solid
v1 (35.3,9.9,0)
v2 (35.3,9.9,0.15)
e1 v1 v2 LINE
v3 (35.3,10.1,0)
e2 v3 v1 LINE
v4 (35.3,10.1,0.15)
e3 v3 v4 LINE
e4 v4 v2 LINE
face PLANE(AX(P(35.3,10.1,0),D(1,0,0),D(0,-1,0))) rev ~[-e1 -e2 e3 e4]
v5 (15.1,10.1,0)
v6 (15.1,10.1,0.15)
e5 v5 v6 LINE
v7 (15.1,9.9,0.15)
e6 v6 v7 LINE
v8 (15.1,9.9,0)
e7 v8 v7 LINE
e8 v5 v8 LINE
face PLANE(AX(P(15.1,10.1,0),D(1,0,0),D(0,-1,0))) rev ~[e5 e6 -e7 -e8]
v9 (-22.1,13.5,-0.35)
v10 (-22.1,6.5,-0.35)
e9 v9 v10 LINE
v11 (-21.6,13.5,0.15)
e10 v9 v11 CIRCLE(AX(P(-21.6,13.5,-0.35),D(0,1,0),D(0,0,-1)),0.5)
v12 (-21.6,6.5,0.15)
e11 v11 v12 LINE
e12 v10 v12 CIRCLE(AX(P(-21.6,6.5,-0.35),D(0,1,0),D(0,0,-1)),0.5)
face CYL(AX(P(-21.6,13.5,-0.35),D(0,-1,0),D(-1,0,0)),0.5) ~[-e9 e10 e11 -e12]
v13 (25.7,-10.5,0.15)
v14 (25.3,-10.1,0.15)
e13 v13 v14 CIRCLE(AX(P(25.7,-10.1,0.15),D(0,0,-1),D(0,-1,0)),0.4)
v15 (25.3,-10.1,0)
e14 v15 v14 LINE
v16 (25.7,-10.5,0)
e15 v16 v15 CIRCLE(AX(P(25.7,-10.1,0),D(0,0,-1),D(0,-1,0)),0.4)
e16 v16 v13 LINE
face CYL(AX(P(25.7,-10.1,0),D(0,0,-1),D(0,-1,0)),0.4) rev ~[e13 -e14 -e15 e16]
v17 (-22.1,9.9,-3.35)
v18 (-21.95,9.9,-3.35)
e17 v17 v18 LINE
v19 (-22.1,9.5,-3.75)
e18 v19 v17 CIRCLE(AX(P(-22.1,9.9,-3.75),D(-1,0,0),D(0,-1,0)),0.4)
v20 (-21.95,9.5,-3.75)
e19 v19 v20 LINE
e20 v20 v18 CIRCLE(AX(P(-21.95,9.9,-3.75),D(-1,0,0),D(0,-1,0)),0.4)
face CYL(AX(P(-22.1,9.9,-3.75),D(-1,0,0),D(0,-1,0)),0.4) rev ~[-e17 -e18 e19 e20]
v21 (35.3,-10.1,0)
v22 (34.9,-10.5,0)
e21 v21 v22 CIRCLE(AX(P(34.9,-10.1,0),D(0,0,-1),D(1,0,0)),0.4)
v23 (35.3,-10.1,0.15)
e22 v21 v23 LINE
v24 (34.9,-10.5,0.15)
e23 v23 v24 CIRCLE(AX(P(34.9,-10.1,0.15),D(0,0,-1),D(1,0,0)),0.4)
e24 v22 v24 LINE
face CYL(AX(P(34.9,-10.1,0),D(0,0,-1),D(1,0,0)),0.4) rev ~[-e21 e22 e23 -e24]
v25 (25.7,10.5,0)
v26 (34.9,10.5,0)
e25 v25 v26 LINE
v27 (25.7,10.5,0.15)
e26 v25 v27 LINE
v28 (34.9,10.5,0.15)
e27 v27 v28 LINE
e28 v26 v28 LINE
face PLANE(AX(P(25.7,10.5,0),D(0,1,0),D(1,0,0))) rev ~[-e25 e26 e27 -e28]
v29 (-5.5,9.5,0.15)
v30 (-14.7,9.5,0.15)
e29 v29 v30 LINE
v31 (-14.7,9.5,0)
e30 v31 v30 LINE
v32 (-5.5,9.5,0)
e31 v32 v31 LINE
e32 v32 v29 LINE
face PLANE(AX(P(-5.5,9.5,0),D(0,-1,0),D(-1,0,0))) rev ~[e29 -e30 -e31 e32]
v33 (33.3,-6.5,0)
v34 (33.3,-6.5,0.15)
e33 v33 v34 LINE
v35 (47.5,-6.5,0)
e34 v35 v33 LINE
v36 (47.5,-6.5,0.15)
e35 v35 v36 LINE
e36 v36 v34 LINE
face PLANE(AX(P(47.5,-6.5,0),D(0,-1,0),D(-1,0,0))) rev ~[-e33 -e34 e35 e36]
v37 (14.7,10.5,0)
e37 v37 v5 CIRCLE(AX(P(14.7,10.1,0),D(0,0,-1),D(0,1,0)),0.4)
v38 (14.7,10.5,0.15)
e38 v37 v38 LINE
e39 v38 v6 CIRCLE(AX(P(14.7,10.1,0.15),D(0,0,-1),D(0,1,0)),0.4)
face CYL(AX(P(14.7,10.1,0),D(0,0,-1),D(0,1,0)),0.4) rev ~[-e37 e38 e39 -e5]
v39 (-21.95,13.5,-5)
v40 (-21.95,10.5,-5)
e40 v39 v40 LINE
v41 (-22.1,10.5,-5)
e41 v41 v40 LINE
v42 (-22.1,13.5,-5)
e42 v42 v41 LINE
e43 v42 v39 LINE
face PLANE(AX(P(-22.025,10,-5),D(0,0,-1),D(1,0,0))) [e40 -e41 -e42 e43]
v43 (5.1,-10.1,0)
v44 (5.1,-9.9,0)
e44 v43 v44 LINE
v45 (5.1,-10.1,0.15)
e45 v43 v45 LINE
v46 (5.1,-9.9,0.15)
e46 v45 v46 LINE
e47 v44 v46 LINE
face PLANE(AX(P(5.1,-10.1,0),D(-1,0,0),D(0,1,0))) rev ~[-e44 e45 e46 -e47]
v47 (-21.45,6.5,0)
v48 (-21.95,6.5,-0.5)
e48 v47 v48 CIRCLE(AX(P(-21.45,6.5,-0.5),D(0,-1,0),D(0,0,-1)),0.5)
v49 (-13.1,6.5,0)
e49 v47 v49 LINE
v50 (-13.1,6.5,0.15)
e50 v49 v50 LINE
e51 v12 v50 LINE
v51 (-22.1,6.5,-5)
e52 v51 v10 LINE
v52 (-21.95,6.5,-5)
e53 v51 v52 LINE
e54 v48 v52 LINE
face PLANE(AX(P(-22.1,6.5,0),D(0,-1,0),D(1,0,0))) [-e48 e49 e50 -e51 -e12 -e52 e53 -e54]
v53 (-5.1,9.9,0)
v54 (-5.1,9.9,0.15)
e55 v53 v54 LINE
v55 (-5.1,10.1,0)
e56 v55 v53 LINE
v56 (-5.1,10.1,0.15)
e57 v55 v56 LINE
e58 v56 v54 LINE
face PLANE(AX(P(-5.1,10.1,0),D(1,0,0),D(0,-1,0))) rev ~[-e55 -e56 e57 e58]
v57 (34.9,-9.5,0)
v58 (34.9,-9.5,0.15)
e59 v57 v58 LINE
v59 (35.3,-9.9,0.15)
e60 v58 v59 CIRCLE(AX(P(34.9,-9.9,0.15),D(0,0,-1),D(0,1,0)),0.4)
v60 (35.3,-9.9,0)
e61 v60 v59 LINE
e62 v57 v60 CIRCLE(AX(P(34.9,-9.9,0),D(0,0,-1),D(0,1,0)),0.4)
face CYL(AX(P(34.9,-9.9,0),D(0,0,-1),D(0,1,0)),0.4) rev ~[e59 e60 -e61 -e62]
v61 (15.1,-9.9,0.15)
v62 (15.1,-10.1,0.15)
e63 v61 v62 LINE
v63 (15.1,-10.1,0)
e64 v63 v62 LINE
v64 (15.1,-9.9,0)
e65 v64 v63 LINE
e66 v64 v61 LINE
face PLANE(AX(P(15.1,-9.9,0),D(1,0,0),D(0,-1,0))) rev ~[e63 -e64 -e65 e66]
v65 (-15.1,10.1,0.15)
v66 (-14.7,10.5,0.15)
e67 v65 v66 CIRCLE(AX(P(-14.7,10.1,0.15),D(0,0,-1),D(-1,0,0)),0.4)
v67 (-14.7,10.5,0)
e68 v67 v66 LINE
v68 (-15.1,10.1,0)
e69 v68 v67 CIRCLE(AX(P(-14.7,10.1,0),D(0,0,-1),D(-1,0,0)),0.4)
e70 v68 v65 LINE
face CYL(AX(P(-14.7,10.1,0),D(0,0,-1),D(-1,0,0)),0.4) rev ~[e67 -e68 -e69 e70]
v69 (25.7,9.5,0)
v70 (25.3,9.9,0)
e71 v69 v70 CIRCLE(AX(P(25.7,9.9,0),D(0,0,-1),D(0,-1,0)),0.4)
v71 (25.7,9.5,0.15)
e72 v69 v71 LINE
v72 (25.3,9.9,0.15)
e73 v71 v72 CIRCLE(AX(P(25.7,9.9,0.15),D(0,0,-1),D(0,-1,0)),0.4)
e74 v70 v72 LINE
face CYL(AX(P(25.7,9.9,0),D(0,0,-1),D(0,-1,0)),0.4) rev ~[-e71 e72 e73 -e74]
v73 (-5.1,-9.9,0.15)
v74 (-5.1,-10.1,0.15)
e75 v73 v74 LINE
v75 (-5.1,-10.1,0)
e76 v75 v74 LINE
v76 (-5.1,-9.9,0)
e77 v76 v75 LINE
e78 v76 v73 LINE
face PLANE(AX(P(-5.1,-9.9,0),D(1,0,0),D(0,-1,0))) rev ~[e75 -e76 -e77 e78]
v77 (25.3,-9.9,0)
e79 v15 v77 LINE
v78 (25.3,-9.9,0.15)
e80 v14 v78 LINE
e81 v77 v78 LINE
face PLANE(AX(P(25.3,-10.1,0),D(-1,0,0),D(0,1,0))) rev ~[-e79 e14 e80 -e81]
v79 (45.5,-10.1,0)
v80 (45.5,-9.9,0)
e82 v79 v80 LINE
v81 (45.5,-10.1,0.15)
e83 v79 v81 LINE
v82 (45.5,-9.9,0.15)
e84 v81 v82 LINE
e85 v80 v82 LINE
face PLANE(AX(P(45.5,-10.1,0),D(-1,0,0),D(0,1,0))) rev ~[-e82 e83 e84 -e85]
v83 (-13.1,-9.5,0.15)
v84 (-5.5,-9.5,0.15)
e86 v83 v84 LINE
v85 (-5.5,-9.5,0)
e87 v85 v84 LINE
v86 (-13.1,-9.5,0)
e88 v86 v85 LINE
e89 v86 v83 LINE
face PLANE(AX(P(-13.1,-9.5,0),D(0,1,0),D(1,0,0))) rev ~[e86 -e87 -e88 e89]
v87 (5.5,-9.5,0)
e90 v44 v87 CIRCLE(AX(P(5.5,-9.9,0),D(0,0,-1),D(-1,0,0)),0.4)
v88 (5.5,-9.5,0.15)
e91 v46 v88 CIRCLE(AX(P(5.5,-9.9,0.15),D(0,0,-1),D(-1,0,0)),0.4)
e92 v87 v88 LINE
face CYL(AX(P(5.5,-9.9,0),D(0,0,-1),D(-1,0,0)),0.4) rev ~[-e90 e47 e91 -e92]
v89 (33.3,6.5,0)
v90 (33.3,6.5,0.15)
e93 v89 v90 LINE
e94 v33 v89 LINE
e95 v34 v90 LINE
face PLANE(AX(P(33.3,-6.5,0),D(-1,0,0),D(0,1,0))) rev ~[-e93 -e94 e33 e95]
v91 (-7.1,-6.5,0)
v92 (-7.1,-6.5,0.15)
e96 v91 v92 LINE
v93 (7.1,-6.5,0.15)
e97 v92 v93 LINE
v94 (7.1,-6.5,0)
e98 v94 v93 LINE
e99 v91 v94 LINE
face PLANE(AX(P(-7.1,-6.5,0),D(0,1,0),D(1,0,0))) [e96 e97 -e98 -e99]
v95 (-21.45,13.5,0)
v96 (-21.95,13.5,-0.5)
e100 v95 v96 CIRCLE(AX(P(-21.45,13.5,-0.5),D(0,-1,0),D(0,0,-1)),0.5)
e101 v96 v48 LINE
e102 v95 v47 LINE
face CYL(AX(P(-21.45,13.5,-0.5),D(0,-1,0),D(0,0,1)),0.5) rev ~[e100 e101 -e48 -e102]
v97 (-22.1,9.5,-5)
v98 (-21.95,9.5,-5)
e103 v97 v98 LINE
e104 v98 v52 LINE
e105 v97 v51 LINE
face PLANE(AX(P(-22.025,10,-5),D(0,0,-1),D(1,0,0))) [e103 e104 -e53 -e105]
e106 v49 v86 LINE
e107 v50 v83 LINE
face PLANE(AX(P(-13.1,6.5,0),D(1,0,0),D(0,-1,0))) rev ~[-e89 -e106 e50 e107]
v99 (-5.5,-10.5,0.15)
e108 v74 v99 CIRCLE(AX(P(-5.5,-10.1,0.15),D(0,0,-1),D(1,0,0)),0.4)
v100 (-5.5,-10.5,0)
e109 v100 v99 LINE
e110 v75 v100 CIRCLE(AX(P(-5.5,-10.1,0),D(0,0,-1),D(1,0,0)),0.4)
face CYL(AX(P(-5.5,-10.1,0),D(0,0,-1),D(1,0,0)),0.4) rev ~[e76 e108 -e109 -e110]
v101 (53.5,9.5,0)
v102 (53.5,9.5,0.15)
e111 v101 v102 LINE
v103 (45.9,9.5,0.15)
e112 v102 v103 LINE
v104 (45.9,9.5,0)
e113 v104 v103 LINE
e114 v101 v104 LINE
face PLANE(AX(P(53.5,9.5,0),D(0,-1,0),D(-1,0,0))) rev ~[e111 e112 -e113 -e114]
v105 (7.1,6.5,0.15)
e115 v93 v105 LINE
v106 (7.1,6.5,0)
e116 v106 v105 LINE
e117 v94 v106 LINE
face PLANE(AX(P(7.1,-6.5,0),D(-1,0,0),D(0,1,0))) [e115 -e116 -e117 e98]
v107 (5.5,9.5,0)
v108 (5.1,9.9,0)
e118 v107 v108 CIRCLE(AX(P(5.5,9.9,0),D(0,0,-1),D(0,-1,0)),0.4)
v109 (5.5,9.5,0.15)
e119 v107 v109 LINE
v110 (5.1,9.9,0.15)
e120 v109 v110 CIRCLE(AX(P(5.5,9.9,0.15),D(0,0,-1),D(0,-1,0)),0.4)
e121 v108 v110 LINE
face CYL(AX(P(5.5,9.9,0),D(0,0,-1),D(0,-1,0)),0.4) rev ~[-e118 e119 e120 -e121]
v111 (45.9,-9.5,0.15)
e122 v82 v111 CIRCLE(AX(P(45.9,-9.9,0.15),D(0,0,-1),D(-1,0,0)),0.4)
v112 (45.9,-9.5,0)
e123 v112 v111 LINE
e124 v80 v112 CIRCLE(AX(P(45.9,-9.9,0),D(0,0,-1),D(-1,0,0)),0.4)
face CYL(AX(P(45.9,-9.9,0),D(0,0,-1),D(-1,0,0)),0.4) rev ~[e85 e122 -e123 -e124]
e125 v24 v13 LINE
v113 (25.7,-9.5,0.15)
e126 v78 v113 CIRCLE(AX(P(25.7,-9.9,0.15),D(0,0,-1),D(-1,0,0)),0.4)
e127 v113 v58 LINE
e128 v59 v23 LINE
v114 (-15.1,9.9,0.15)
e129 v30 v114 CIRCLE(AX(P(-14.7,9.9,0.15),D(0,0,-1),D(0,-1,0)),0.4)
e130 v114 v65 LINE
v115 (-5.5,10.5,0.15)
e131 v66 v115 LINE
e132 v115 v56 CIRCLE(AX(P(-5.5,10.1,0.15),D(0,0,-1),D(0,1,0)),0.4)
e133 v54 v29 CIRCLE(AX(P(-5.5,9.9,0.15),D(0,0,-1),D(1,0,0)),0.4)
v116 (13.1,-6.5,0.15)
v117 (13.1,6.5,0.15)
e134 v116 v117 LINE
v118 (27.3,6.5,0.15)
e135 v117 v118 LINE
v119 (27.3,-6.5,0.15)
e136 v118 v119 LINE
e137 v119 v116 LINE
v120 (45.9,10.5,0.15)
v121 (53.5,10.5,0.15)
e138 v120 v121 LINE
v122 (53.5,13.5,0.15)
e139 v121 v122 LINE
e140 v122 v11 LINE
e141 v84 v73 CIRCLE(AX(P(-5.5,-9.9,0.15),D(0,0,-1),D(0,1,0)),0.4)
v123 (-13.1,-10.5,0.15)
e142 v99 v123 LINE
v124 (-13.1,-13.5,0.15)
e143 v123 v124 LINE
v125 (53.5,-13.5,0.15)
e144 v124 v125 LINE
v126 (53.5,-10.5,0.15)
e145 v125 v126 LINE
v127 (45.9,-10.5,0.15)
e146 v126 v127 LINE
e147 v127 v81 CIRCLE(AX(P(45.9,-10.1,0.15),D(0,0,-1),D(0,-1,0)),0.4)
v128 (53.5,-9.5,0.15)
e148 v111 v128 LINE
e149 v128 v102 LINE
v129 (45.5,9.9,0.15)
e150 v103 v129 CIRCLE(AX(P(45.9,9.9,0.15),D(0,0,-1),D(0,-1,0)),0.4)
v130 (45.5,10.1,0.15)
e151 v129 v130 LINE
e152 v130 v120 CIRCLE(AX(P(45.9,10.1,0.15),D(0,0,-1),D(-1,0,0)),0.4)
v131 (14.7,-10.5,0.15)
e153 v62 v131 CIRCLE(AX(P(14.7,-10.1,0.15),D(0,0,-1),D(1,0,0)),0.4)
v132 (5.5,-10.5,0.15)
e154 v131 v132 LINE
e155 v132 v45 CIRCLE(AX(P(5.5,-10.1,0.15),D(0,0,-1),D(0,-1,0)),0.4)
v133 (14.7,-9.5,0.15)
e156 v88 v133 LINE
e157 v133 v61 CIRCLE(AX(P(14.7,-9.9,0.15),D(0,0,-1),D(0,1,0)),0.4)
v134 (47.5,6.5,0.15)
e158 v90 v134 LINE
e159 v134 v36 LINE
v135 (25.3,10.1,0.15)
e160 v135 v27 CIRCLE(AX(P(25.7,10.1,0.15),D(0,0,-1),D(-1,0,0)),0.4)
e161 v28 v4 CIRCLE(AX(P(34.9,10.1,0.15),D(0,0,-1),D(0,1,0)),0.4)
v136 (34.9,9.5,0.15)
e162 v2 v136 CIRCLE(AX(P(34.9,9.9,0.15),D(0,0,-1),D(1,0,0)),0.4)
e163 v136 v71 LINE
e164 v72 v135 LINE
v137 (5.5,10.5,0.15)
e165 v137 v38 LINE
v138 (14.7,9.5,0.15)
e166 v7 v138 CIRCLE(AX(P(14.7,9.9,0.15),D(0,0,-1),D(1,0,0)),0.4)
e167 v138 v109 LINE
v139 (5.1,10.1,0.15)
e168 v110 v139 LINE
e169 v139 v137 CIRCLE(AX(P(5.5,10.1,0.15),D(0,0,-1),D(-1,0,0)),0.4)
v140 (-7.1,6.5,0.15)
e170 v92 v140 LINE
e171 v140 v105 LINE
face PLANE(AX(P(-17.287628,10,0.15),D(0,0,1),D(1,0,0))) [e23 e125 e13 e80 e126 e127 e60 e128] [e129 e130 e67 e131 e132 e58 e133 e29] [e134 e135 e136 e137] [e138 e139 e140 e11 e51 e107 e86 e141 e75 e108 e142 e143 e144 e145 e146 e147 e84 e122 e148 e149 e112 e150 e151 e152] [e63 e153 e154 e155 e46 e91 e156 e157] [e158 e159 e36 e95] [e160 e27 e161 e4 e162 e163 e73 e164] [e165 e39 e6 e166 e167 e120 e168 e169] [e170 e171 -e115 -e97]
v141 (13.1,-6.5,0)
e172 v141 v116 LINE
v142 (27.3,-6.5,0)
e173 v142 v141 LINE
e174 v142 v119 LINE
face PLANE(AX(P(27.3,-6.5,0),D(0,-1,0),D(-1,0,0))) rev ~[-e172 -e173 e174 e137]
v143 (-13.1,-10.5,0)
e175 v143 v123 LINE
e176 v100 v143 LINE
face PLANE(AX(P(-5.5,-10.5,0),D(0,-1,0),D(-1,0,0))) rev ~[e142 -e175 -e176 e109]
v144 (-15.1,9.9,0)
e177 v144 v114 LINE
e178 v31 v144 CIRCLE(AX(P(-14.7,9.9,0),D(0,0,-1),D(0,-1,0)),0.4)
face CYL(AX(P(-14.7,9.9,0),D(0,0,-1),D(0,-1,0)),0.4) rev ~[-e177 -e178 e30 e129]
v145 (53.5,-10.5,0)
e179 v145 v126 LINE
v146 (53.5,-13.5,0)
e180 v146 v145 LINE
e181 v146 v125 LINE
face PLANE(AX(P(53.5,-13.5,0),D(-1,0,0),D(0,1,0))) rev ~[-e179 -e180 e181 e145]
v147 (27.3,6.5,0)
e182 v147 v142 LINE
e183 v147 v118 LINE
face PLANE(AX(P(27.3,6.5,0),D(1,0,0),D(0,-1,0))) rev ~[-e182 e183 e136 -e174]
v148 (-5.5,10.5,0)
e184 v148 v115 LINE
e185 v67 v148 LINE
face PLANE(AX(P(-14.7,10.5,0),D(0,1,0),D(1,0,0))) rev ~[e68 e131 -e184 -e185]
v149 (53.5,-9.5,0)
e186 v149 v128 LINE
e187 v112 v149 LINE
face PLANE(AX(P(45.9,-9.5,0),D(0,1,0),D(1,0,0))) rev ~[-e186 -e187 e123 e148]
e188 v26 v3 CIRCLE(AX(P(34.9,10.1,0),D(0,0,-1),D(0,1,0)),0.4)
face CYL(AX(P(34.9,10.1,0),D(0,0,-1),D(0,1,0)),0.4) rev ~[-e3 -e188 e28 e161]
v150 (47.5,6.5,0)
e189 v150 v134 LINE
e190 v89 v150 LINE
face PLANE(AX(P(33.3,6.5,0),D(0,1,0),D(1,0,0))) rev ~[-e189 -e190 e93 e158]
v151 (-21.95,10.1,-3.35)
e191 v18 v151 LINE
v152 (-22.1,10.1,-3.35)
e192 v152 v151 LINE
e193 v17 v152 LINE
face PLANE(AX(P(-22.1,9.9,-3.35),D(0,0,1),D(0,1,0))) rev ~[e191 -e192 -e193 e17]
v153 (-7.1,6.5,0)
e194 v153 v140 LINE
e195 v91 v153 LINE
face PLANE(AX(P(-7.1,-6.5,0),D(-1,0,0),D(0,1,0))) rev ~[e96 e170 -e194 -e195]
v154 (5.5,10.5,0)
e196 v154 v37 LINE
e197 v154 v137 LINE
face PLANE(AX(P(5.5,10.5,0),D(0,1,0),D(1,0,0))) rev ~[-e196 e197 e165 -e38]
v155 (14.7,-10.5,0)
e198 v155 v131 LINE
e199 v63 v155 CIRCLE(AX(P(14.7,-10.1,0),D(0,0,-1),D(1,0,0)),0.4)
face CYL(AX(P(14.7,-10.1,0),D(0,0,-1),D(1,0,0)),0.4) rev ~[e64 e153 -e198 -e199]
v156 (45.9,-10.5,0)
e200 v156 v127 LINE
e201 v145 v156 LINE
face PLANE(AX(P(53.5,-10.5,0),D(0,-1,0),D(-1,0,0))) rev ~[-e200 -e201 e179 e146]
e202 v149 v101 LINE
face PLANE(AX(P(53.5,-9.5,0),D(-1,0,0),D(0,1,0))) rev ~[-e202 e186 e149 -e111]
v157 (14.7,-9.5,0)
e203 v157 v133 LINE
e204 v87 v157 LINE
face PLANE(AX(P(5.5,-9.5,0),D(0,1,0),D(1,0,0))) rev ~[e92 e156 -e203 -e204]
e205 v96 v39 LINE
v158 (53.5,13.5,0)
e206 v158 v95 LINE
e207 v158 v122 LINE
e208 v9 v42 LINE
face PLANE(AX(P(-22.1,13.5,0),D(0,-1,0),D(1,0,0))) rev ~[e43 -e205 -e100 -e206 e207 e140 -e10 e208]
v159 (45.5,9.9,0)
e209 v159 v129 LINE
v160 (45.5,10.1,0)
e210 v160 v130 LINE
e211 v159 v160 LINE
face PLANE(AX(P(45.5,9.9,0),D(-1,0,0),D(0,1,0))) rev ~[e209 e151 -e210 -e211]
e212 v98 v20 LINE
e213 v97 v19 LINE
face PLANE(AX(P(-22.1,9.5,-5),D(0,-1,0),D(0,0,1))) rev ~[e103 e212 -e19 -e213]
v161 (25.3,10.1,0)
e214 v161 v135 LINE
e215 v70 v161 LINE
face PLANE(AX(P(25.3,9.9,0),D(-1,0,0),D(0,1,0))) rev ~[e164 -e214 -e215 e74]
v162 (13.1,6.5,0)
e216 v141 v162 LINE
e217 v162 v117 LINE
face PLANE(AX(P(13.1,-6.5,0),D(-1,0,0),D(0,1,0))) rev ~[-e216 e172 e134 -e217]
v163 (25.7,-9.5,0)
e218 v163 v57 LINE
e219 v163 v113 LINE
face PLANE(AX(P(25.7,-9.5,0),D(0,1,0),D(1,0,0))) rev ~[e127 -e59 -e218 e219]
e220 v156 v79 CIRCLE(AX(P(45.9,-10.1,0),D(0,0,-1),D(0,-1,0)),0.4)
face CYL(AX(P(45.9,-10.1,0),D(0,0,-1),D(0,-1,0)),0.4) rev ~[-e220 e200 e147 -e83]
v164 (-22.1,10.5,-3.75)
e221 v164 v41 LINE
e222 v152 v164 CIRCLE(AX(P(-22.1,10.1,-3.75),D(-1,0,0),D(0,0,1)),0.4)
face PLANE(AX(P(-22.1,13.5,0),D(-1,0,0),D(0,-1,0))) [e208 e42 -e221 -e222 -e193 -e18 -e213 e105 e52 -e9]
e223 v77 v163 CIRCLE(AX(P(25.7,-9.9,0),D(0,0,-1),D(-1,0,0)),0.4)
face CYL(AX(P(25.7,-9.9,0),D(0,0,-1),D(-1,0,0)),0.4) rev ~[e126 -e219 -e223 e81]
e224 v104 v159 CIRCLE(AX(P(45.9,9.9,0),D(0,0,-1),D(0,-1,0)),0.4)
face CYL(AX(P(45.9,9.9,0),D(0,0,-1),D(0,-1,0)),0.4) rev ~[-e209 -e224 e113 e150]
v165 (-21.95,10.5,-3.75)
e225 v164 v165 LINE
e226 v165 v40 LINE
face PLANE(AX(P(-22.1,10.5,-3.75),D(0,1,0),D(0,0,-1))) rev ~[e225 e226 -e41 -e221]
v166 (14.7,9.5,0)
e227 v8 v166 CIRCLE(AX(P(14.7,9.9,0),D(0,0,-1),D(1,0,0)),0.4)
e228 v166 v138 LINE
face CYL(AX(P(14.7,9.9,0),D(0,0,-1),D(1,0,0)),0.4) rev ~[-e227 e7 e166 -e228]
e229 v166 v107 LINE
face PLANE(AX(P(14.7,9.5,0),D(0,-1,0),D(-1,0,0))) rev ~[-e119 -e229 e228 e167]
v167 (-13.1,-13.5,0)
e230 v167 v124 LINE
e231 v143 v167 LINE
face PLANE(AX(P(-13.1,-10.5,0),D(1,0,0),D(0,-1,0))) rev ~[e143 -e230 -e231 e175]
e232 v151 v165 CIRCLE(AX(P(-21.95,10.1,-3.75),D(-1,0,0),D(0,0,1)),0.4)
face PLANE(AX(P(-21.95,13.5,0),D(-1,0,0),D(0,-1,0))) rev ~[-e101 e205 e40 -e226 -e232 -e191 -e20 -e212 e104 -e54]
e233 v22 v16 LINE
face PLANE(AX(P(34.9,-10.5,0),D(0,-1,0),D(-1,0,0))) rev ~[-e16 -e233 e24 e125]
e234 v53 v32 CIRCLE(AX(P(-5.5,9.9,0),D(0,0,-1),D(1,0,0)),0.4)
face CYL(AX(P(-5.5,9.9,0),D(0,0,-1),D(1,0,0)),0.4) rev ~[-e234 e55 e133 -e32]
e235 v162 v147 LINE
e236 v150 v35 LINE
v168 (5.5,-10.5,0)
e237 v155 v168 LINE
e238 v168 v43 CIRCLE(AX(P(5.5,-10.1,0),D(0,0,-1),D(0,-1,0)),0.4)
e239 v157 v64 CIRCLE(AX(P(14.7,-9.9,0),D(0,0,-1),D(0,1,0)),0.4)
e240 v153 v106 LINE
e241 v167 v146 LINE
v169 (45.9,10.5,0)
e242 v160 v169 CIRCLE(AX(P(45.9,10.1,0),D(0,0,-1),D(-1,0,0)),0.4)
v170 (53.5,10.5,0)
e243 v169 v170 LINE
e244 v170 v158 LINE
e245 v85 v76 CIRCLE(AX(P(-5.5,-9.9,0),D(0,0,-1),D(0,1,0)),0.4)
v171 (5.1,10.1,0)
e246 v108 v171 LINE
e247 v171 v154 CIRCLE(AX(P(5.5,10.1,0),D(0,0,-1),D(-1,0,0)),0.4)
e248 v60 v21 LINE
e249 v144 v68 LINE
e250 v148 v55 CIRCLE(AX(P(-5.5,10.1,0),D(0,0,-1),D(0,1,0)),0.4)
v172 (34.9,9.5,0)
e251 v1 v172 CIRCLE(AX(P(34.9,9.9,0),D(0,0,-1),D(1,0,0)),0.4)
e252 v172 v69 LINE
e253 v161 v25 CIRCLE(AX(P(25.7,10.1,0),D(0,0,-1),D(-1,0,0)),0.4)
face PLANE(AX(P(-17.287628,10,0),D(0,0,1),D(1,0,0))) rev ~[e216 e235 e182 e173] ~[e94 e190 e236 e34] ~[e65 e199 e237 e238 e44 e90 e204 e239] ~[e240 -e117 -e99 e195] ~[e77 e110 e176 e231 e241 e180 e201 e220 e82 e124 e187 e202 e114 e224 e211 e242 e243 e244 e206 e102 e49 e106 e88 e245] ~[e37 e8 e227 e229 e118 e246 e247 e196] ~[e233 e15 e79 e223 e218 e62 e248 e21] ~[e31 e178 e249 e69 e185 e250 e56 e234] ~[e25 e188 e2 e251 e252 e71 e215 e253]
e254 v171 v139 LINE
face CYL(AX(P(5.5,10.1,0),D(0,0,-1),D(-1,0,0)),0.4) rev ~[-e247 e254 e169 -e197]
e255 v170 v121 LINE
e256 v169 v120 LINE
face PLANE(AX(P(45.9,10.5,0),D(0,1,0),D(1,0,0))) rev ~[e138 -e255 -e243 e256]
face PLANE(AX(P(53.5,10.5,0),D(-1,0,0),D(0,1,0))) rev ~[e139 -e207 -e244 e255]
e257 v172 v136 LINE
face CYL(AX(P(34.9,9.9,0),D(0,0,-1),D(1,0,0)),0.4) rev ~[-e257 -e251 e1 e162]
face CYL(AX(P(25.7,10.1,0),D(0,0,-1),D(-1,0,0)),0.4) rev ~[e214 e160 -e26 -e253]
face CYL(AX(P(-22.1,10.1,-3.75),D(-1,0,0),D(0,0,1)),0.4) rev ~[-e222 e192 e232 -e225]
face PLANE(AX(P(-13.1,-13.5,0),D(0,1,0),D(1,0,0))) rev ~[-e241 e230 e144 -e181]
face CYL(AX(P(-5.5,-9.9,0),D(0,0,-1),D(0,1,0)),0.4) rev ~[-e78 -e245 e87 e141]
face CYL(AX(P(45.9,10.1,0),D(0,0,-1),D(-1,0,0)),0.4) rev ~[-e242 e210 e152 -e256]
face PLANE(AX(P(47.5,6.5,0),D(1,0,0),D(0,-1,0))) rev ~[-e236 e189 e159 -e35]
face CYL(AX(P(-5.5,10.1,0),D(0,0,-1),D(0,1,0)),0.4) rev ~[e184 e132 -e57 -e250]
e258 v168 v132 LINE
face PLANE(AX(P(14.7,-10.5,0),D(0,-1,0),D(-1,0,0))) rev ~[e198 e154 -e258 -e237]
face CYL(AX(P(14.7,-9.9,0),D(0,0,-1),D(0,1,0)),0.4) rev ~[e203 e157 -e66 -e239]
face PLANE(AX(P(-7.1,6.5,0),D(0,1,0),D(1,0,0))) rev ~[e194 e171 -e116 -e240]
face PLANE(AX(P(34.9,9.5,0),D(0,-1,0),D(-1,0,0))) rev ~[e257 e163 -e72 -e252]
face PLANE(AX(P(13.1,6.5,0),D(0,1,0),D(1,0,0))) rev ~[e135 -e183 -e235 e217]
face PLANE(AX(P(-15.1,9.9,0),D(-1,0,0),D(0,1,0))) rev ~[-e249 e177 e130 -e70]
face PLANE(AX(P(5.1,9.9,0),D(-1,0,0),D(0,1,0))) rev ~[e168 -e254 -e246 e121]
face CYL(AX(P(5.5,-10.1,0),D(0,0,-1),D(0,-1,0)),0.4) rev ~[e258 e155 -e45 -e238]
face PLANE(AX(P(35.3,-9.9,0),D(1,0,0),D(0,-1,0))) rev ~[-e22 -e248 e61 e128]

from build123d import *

# Parameters (mm, degrees)
F0_W     = 14.2
F0_H     = 13
F1_DEPTH = 0.15
F2_W     = 0.15
F2_H     = 7
F3_DEPTH = 5
F4_R     = 0.5
F6_DEPTH = 25


# Not quite as in the source:
# - a feature names something its author has since deleted; it is built from what else it names


with BuildPart() as f1:
    # F0 (on Top) → F1 (new body)
    with BuildSketch(Plane.XY):
        with BuildLine():
            Line((-13.1, 10.5), (-13.1, 13.5))
            Line((-13.1, 13.5), (-22.1, 13.5))
            Line((-22.1, 13.5), (-22.1, 6.5))
            Line((-22.1, 6.5), (-13.1, 6.5))
            Line((-13.1, 6.5), (-13.1, 9.5))
            Line((-13.1, 9.5), (-14.7, 9.5))
            ThreePointArc((-14.7, 9.5), (-14.9828427125, 9.6171572875), (-15.1, 9.9))
            Line((-15.1, 9.9), (-15.1, 10.1))
            ThreePointArc((-15.1, 10.1), (-14.9828427125, 10.3828427125), (-14.7, 10.5))
            Line((-14.7, 10.5), (-13.1, 10.5))
        make_face()
        with BuildLine():
            Line((13.1, 10.5), (13.1, 13.5))
            Line((13.1, 13.5), (-7.1, 13.5))
            Line((-7.1, 13.5), (-13.1, 13.5))
            Line((-13.1, 13.5), (-13.1, 10.5))
            Line((-13.1, 10.5), (-5.5, 10.5))
            ThreePointArc((-5.5, 10.5), (-5.2171572875, 10.3828427125), (-5.1, 10.1))
            Line((-5.1, 10.1), (-5.1, 9.9))
            ThreePointArc((-5.1, 9.9), (-5.2171572875, 9.6171572875), (-5.5, 9.5))
            Line((-5.5, 9.5), (-13.1, 9.5))
            Line((-13.1, 9.5), (-13.1, 6.5))
            Line((-13.1, 6.5), (-13.1, 0))
            Line((-13.1, 0), (-13.1, -6.5))
            Line((-13.1, -6.5), (-13.1, -9.5))
            Line((-13.1, -9.5), (-5.5, -9.5))
            ThreePointArc((-5.5, -9.5), (-5.2171572875, -9.6171572875), (-5.1, -9.9))
            Line((-5.1, -9.9), (-5.1, -10.1))
            ThreePointArc((-5.1, -10.1), (-5.2171572875, -10.3828427125), (-5.5, -10.5))
            Line((-5.5, -10.5), (-13.1, -10.5))
            Line((-13.1, -10.5), (-13.1, -13.5))
            Line((-13.1, -13.5), (-7.1, -13.5))
            Line((-7.1, -13.5), (13.1, -13.5))
            Line((13.1, -13.5), (13.1, -10.5))
            Line((13.1, -10.5), (5.5, -10.5))
            ThreePointArc((5.5, -10.5), (5.2171572875, -10.3828427125), (5.1, -10.1))
            Line((5.1, -10.1), (5.1, -9.9))
            ThreePointArc((5.1, -9.9), (5.2171572875, -9.6171572875), (5.5, -9.5))
            Line((5.5, -9.5), (13.1, -9.5))
            Line((13.1, -9.5), (13.1, -6.5))
            Line((13.1, -6.5), (13.1, 0))
            Line((13.1, 0), (13.1, 6.5))
            Line((13.1, 6.5), (13.1, 9.5))
            Line((13.1, 9.5), (5.5, 9.5))
            ThreePointArc((5.5, 9.5), (5.2171572875, 9.6171572875), (5.1, 9.9))
            Line((5.1, 9.9), (5.1, 10.1))
            ThreePointArc((5.1, 10.1), (5.2171572875, 10.3828427125), (5.5, 10.5))
            Line((5.5, 10.5), (13.1, 10.5))
        make_face()
        Rectangle(F0_W, F0_H, mode=Mode.SUBTRACT)
        with BuildLine():
            Line((33.3, 13.5), (13.1, 13.5))
            Line((13.1, 13.5), (13.1, 10.5))
            Line((13.1, 10.5), (14.7, 10.5))
            ThreePointArc((14.7, 10.5), (14.9828427125, 10.3828427125), (15.1, 10.1))
            Line((15.1, 10.1), (15.1, 9.9))
            ThreePointArc((15.1, 9.9), (14.9828427125, 9.6171572875), (14.7, 9.5))
            Line((14.7, 9.5), (13.1, 9.5))
            Line((13.1, 9.5), (13.1, 6.5))
            Line((13.1, 6.5), (27.3, 6.5))
            Line((27.3, 6.5), (27.3, -6.5))
            Line((27.3, -6.5), (13.1, -6.5))
            Line((13.1, -6.5), (13.1, -9.5))
            Line((13.1, -9.5), (14.7, -9.5))
            ThreePointArc((14.7, -9.5), (14.9828427125, -9.6171572875), (15.1, -9.9))
            Line((15.1, -9.9), (15.1, -10.1))
            ThreePointArc((15.1, -10.1), (14.9828427125, -10.3828427125), (14.7, -10.5))
            Line((14.7, -10.5), (13.1, -10.5))
            Line((13.1, -10.5), (13.1, -13.5))
            Line((13.1, -13.5), (33.3, -13.5))
            Line((33.3, -13.5), (33.3, -10.5))
            Line((33.3, -10.5), (25.7, -10.5))
            ThreePointArc((25.7, -10.5), (25.4171572875, -10.3828427125), (25.3, -10.1))
            Line((25.3, -10.1), (25.3, -9.9))
            ThreePointArc((25.3, -9.9), (25.4171572875, -9.6171572875), (25.7, -9.5))
            Line((25.7, -9.5), (33.3, -9.5))
            Line((33.3, -9.5), (33.3, -6.5))
            Line((33.3, -6.5), (33.3, 0))
            Line((33.3, 0), (33.3, 6.5))
            Line((33.3, 6.5), (33.3, 9.5))
            Line((33.3, 9.5), (25.7, 9.5))
            ThreePointArc((25.7, 9.5), (25.4171572875, 9.6171572875), (25.3, 9.9))
            Line((25.3, 9.9), (25.3, 10.1))
            ThreePointArc((25.3, 10.1), (25.4171572875, 10.3828427125), (25.7, 10.5))
            Line((25.7, 10.5), (33.3, 10.5))
            Line((33.3, 10.5), (33.3, 13.5))
        make_face()
        with BuildLine():
            Line((53.5, 13.5), (33.3, 13.5))
            Line((33.3, 13.5), (33.3, 10.5))
            Line((33.3, 10.5), (34.9, 10.5))
            ThreePointArc((34.9, 10.5), (35.1828427125, 10.3828427125), (35.3, 10.1))
            Line((35.3, 10.1), (35.3, 9.9))
            ThreePointArc((35.3, 9.9), (35.1828427125, 9.6171572875), (34.9, 9.5))
            Line((34.9, 9.5), (33.3, 9.5))
            Line((33.3, 9.5), (33.3, 6.5))
            Line((33.3, 6.5), (47.5, 6.5))
            Line((47.5, 6.5), (47.5, -6.5))
            Line((47.5, -6.5), (33.3, -6.5))
            Line((33.3, -6.5), (33.3, -9.5))
            Line((33.3, -9.5), (34.9, -9.5))
            ThreePointArc((34.9, -9.5), (35.1828427125, -9.6171572875), (35.3, -9.9))
            Line((35.3, -9.9), (35.3, -10.1))
            ThreePointArc((35.3, -10.1), (35.1828427125, -10.3828427125), (34.9, -10.5))
            Line((34.9, -10.5), (33.3, -10.5))
            Line((33.3, -10.5), (33.3, -13.5))
            Line((33.3, -13.5), (53.5, -13.5))
            Line((53.5, -13.5), (53.5, -10.5))
            Line((53.5, -10.5), (45.9, -10.5))
            ThreePointArc((45.9, -10.5), (45.6171572875, -10.3828427125), (45.5, -10.1))
            Line((45.5, -10.1), (45.5, -9.9))
            ThreePointArc((45.5, -9.9), (45.6171572875, -9.6171572875), (45.9, -9.5))
            Line((45.9, -9.5), (53.5, -9.5))
            Line((53.5, -9.5), (53.5, 0))
            Line((53.5, 0), (53.5, 9.5))
            Line((53.5, 9.5), (45.9, 9.5))
            ThreePointArc((45.9, 9.5), (45.6171572875, 9.6171572875), (45.5, 9.9))
            Line((45.5, 9.9), (45.5, 10.1))
            ThreePointArc((45.5, 10.1), (45.6171572875, 10.3828427125), (45.9, 10.5))
            Line((45.9, 10.5), (53.5, 10.5))
            Line((53.5, 10.5), (53.5, 13.5))
        make_face()
    extrude(amount=F1_DEPTH)

    # F2 (on face) → F3 (join)
    with BuildSketch(Plane(origin=(0, 0, 0), x_dir=(1, 0, 0), z_dir=(0, 0, -1))):
        with Locations((-22.025, -10)):
            Rectangle(F2_W, F2_H)
    extrude(amount=F3_DEPTH)

    # F4
    f4_edges = [f1.edges().sort_by_distance(p)[0] for p in [
        (-21.95, 10, 0),
        (-22.1, 10, 0.15),
    ]]
    fillet(f4_edges, radius=F4_R)

    # F5 (on face) → F6 (cut)
    with BuildSketch(Plane(origin=(-22.1, 0, 0), x_dir=(0, -1, 0), z_dir=(-1, 0, 0))):
        with BuildLine():
            Line((-9.9, -3.35), (-10, -3.35))
            Line((-10, -3.35), (-10.1, -3.35))
            ThreePointArc((-10.1, -3.35), (-10.3828427125, -3.4671572875), (-10.5, -3.75))
            Line((-10.5, -3.75), (-10.5, -5))
            Line((-10.5, -5), (-9.5, -5))
            Line((-9.5, -5), (-9.5, -3.75))
            ThreePointArc((-9.5, -3.75), (-9.6171572875, -3.4671572875), (-9.9, -3.35))
        make_face()
    extrude(amount=-F6_DEPTH, mode=Mode.SUBTRACT)


solid = f1.part
